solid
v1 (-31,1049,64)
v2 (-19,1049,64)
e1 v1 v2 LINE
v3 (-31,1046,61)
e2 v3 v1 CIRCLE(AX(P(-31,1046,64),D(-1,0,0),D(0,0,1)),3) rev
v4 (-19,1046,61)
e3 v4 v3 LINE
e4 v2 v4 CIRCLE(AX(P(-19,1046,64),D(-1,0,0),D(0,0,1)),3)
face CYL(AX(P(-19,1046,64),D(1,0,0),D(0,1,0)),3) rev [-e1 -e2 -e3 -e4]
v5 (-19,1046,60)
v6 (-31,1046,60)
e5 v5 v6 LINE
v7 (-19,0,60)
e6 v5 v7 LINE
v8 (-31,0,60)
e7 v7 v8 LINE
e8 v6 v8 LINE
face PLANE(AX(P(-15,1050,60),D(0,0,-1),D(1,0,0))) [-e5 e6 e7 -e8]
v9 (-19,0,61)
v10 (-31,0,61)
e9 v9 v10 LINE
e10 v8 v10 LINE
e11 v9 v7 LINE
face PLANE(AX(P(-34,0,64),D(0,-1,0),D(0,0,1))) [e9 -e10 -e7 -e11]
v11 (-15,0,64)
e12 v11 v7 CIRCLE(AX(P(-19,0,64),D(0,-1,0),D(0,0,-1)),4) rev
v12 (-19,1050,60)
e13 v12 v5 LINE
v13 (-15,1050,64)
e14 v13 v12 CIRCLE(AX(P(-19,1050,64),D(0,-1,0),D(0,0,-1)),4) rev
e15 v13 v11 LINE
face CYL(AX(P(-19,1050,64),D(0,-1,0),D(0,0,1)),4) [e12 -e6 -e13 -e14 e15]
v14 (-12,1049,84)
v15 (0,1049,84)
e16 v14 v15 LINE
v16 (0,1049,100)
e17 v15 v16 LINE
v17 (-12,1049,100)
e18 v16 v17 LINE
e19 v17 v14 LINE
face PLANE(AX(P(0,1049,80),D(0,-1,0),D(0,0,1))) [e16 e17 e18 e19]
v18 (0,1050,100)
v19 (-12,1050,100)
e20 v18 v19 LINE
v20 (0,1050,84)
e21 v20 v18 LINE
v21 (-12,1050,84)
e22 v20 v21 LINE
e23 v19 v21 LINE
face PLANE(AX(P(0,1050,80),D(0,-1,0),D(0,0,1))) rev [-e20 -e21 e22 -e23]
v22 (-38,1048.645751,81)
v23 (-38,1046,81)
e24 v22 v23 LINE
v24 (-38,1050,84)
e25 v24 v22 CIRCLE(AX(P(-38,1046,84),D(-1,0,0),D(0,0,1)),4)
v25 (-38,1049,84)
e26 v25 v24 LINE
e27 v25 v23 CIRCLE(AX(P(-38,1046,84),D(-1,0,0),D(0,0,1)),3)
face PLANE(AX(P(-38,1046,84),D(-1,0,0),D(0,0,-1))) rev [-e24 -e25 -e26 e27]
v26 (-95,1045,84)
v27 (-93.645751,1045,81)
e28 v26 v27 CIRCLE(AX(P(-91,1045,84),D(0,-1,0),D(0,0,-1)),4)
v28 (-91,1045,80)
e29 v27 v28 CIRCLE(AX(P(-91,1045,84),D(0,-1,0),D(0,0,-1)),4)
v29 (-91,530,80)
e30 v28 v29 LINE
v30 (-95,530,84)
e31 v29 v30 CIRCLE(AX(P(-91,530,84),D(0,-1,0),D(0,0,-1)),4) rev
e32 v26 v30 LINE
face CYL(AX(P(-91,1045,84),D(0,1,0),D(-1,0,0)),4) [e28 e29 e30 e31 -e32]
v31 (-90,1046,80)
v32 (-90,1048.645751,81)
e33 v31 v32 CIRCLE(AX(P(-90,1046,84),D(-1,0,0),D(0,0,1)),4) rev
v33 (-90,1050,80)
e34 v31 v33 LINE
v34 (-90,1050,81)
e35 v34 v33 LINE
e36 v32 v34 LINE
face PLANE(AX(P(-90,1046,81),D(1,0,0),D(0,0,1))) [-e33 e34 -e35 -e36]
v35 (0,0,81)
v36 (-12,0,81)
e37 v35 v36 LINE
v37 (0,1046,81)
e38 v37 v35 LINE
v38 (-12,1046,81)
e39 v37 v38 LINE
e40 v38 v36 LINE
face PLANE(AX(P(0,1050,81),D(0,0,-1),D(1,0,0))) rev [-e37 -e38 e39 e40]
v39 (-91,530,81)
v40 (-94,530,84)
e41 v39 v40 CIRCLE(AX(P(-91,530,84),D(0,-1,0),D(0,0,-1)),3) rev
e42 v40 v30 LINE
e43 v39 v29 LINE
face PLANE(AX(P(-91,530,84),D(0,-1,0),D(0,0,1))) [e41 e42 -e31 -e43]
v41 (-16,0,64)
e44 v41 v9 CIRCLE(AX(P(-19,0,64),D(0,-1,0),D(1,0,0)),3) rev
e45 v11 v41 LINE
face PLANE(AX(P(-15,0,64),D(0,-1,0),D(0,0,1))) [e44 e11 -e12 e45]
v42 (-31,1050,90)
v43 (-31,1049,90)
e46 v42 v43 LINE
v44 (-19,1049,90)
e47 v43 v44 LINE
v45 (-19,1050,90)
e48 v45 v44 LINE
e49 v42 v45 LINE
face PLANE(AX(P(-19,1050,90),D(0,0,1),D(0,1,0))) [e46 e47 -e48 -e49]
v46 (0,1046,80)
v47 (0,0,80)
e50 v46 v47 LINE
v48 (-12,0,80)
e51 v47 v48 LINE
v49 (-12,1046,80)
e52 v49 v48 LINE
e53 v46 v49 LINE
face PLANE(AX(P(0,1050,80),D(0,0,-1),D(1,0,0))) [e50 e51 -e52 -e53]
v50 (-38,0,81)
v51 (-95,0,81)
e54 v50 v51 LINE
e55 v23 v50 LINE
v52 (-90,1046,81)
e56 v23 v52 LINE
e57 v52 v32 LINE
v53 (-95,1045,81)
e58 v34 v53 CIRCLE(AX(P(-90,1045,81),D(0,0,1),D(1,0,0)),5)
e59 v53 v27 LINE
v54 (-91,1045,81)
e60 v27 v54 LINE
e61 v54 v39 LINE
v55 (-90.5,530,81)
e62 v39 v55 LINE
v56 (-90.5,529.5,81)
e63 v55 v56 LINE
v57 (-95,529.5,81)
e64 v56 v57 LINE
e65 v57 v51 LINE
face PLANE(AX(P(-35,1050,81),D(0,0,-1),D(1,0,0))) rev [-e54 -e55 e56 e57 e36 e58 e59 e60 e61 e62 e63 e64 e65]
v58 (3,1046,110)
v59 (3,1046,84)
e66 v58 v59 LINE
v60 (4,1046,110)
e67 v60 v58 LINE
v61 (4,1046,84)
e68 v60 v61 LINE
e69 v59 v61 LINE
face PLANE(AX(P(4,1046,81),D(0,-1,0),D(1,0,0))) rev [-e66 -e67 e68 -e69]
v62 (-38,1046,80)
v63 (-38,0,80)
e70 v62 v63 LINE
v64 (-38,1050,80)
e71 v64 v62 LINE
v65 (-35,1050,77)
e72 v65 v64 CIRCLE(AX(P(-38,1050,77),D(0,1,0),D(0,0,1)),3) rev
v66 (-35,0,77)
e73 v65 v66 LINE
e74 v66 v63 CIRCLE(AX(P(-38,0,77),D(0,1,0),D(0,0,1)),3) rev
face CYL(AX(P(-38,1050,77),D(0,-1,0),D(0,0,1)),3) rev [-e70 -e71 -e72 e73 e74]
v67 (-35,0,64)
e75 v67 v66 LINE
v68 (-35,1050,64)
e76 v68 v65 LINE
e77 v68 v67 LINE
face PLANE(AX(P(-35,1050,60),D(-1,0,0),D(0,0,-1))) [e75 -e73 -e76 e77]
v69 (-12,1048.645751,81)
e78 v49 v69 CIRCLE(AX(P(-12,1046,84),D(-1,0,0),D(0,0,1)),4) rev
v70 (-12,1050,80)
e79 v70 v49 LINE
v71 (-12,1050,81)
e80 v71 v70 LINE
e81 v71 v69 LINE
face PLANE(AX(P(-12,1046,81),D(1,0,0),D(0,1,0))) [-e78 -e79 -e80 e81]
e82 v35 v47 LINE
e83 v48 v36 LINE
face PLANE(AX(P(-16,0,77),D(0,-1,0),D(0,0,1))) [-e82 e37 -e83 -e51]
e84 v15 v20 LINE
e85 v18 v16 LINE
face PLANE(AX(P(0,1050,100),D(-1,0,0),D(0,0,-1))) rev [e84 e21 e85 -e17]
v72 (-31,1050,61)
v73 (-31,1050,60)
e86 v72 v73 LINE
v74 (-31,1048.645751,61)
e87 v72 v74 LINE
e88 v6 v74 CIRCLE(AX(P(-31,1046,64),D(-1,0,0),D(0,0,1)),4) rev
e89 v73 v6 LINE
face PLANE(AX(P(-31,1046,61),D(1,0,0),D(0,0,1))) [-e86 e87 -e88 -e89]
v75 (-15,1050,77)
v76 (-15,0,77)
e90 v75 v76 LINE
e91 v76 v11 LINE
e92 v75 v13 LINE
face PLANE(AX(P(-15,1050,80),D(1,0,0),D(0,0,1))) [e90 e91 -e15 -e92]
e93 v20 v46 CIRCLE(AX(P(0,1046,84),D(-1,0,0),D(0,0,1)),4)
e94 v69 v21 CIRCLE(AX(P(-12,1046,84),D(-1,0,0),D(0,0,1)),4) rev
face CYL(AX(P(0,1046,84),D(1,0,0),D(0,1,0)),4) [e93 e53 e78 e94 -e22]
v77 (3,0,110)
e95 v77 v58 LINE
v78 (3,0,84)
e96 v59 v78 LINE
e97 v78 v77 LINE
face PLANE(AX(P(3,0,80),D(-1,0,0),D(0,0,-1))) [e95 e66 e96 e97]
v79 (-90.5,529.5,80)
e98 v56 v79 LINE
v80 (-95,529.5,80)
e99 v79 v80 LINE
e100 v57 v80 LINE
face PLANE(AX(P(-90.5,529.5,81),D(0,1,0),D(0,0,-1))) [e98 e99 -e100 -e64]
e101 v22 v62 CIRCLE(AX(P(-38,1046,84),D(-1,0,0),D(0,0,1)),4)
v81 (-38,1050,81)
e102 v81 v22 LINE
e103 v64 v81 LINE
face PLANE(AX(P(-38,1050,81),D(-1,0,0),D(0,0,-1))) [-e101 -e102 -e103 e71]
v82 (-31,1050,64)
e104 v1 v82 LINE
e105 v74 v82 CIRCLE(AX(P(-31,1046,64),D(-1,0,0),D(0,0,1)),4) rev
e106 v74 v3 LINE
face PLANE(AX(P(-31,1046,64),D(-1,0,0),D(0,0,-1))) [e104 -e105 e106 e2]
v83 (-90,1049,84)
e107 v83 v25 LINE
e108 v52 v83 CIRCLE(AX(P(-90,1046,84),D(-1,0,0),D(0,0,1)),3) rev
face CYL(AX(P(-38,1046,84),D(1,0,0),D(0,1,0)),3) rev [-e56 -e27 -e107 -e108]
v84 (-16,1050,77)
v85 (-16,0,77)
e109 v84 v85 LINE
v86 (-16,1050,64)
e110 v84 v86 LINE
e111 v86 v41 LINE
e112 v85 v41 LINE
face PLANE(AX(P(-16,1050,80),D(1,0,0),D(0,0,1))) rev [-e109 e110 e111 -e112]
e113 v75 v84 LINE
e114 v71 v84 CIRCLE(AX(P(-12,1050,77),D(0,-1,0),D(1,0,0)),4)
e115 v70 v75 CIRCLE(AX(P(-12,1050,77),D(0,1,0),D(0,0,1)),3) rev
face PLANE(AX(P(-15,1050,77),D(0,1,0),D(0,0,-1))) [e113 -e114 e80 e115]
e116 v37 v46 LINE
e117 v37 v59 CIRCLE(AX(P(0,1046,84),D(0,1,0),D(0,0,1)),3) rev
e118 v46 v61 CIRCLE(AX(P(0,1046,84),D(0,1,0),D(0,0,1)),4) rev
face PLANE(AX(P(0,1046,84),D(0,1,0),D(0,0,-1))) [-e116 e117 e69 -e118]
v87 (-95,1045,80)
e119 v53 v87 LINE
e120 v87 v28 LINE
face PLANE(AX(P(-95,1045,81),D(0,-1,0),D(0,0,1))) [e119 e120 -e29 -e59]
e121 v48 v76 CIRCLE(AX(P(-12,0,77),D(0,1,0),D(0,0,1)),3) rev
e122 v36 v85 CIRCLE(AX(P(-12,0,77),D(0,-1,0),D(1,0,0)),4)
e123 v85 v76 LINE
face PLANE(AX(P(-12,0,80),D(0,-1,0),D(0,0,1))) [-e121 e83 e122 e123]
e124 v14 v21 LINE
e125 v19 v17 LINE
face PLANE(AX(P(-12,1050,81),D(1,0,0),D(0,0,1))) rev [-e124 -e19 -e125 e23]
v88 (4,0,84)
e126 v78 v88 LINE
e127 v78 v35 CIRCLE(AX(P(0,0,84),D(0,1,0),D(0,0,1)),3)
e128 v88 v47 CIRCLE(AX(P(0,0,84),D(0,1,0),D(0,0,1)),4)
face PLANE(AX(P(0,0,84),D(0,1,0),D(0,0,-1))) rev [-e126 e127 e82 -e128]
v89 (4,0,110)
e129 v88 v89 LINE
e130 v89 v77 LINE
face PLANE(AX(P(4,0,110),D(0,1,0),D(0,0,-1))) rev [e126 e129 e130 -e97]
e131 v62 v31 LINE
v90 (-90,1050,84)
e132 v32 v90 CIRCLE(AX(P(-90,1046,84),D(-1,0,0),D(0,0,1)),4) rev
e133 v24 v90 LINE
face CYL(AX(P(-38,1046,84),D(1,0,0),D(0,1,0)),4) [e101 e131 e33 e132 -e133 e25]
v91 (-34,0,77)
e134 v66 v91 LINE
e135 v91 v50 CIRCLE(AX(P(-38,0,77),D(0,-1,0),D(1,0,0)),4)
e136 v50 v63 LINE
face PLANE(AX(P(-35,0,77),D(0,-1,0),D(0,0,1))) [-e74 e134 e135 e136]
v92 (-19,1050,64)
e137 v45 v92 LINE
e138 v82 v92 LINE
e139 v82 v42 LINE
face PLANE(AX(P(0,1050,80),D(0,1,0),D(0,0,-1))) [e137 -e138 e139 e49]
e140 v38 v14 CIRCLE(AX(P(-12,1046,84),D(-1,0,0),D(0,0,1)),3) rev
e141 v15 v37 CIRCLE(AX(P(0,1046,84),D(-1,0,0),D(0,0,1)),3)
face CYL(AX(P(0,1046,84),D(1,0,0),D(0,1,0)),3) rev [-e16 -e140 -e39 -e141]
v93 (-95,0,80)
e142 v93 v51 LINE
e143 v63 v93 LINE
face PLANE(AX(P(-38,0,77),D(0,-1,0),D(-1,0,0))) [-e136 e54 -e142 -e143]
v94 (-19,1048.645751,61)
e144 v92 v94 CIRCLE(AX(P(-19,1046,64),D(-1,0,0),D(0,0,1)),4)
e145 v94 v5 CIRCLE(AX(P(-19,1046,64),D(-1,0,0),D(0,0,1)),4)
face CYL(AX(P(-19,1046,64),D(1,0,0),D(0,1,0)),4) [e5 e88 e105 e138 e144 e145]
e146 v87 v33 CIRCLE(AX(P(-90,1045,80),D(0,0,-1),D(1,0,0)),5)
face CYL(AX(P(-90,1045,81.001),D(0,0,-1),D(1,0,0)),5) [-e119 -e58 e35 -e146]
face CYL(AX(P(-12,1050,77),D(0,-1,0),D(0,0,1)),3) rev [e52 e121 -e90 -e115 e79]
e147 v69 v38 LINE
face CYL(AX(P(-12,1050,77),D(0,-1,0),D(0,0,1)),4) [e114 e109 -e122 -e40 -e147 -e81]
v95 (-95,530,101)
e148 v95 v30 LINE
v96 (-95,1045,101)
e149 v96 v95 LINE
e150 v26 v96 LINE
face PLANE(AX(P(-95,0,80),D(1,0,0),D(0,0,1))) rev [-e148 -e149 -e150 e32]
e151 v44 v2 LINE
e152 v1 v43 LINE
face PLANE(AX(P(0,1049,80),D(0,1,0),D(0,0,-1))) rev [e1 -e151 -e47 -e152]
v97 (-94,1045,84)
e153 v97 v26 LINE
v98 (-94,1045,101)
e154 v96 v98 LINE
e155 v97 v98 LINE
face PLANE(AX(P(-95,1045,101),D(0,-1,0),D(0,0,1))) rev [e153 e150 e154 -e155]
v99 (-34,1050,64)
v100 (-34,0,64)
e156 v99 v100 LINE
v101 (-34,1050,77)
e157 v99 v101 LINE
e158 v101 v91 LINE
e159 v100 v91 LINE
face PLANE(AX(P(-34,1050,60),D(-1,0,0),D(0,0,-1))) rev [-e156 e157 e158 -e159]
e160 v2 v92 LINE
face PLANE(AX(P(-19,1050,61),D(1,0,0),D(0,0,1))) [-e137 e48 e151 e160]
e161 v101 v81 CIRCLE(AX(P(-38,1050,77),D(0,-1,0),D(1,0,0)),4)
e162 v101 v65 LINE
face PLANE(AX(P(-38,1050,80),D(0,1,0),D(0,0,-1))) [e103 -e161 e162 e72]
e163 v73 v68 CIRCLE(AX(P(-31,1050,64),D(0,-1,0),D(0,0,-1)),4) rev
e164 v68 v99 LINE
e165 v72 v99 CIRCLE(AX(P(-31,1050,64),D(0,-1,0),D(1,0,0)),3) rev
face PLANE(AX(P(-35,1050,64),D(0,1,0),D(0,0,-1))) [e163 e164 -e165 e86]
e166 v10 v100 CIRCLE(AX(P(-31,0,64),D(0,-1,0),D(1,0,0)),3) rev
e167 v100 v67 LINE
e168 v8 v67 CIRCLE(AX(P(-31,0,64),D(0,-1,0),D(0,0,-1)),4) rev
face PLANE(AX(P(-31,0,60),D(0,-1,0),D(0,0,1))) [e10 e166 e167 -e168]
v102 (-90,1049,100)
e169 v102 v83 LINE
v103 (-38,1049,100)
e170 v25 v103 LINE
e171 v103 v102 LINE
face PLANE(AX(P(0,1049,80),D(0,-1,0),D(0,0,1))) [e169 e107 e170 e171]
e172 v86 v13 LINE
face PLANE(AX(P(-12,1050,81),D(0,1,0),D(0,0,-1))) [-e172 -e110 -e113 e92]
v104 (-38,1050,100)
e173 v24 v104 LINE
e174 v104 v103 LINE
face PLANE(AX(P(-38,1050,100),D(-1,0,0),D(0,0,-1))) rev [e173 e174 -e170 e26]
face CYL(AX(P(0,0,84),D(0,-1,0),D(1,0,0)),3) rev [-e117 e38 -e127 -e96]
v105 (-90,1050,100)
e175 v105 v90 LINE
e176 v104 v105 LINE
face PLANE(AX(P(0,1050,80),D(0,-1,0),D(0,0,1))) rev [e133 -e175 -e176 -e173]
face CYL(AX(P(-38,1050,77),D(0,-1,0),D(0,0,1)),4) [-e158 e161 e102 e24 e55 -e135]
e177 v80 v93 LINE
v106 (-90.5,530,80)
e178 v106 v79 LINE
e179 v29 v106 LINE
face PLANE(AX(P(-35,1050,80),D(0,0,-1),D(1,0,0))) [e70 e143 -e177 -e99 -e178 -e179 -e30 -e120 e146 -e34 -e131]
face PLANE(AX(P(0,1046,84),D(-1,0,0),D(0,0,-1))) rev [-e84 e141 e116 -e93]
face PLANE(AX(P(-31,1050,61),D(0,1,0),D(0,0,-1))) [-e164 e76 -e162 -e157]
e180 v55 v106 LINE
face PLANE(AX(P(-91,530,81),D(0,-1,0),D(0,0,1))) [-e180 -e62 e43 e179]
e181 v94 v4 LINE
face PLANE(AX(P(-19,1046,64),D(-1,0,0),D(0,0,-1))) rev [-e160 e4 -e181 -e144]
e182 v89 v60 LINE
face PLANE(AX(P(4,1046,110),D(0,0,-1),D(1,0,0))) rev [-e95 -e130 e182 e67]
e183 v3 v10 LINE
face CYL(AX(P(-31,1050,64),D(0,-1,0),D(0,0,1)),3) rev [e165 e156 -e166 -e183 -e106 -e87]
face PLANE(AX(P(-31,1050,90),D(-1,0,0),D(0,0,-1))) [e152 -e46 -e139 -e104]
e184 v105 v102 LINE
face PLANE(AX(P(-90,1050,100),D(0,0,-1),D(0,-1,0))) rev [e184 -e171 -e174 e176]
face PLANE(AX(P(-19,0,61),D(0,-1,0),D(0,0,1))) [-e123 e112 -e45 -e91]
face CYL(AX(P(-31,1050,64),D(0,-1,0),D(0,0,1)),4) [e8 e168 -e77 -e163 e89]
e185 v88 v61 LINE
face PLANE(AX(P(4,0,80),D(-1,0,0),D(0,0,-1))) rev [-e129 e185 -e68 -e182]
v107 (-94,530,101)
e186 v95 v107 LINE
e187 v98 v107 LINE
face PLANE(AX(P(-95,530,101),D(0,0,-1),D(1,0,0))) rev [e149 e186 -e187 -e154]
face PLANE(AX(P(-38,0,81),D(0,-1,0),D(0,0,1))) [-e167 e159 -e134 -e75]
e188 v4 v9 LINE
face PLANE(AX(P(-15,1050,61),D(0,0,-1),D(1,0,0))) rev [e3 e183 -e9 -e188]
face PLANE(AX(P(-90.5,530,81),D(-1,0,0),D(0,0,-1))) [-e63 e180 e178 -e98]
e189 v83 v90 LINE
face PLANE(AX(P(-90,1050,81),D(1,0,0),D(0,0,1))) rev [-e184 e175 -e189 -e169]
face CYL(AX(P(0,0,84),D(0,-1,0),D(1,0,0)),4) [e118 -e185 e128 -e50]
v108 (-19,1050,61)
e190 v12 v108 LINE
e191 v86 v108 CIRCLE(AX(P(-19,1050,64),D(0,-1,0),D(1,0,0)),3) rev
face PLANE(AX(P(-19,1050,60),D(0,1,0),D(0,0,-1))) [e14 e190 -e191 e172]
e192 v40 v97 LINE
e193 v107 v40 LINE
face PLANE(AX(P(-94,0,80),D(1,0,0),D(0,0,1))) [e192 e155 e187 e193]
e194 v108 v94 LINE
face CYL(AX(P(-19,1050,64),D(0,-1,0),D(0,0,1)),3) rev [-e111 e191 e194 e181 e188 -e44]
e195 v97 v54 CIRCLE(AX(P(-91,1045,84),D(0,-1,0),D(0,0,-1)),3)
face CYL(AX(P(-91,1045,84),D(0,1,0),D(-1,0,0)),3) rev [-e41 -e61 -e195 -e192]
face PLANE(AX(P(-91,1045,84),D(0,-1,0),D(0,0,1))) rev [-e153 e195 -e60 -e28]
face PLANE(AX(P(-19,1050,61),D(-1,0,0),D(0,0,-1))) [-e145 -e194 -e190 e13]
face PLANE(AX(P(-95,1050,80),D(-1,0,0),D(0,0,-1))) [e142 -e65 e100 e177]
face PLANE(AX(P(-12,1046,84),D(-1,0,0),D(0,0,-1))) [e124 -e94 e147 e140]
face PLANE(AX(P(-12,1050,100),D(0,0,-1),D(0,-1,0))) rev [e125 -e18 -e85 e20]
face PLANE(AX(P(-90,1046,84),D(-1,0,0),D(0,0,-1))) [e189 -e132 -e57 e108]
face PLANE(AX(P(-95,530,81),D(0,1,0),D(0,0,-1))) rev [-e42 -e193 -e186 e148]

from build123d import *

# Parameters (mm, degrees)
BASE_FLANGE1_DEPTH             = 1050
CUT_EXTRUDE1_REACH             = 1056.479
EDGE_FLANGE5_STRIP_W           = 20
EDGE_FLANGE5_STRIP_H           = 1
EDGE_FLANGE5_STRIP_CUT_DEPTH   = 52
EDGE_FLANGE5_STRIP_2_W         = 20
EDGE_FLANGE5_STRIP_2_H         = 1
EDGE_FLANGE5_STRIP_CUT_2_DEPTH = 12
EDGE_FLANGE5_DEPTH             = 52
EDGE_FLANGE5_BEND_DEPTH        = 12
EDGE_FLANGE7_DEPTH             = 1046
EDGE_FLANGE8_STRIP_W           = 10
EDGE_FLANGE8_STRIP_H           = 1
EDGE_FLANGE8_STRIP_CUT_DEPTH   = 12
EDGE_FLANGE8_DEPTH             = 12
EDGE_FLANGE9_START             = 529.5
EDGE_FLANGE9_DEPTH             = 515.5
EDGE_FLANGE9_2_DEPTH           = 0.5
EDGE_FLANGE9_START_2           = 530
EDGE_FLANGE9_3_DEPTH           = 515


# Read off the part's stored shape, not the designer's step: Edge-Flange9
# Sheet-metal steps are written as plain solids
with BuildPart() as part:
    # Sketch1 → Base-Flange1 (new body)
    with BuildSketch(Plane(origin=(0, 0, 0), x_dir=(1, 0, 0), z_dir=(0, 1, 0))):
        with BuildLine():
            Line((0, 0), (-12, 0))
            ThreePointArc((-12, 0), (-14.121320344, -0.878679656), (-15, -3))
            Line((-15, -3), (-15, -16))
            ThreePointArc((-15, -16), (-16.171572875, -18.828427125), (-19, -20))
            Line((-19, -20), (-31, -20))
            ThreePointArc((-31, -20), (-33.828427125, -18.828427125), (-35, -16))
            Line((-35, -16), (-35, -3))
            ThreePointArc((-35, -3), (-35.878679656, -0.878679656), (-38, 0))
            Line((-38, 0), (-95, 0))
            Line((-95, 0), (-95, 1))
            Line((-95, 1), (-38, 1))
            ThreePointArc((-38, 1), (-35.171572875, -0.171572875), (-34, -3))
            Line((-34, -3), (-34, -16))
            ThreePointArc((-34, -16), (-33.121320344, -18.121320344), (-31, -19))
            Line((-31, -19), (-19, -19))
            ThreePointArc((-19, -19), (-16.878679656, -18.121320344), (-16, -16))
            Line((-16, -16), (-16, -3))
            ThreePointArc((-16, -3), (-14.828427125, -0.171572875), (-12, 1))
            Line((-12, 1), (0, 1))
            Line((0, 1), (0, 0))
        make_face()
    extrude(amount=BASE_FLANGE1_DEPTH)

    # Sketch18 → Cut-Extrude1 (cut, up to next)
    with BuildSketch(Plane.XY, mode=Mode.PRIVATE) as cut_extrude1_sk1:
        with BuildLine():
            Line((-95, 1045), (-95, 1050))
            Line((-95, 1050), (-90, 1050))
            ThreePointArc((-90, 1050), (-93.535533906, 1048.535533906), (-95, 1045))
        make_face()
    cut_extrude1_tool1 = extrude(cut_extrude1_sk1.sketch, amount=-CUT_EXTRUDE1_REACH, mode=Mode.PRIVATE) & part.part
    add(cut_extrude1_tool1.solids().sort_by_distance((-93.88316, 1048.88316, 0))[0], mode=Mode.SUBTRACT)

    # Edge-Flange5 strip (across the edge) → Edge-Flange5 strip cut (cut)
    with BuildSketch(Plane(origin=(-90, 1050, -1), x_dir=(0, -1, 0), z_dir=(1, 0, 0))):
        with Locations((-6, -0.5)):
            Rectangle(EDGE_FLANGE5_STRIP_W, EDGE_FLANGE5_STRIP_H)
    extrude(amount=EDGE_FLANGE5_STRIP_CUT_DEPTH, mode=Mode.SUBTRACT)

    # Edge-Flange5 strip 2 (across the edge) → Edge-Flange5 strip cut 2 (cut)
    with BuildSketch(Plane(origin=(-12, 1050, -1), x_dir=(0, -1, 0), z_dir=(1, 0, 0))):
        with Locations((-6, -0.5)):
            Rectangle(EDGE_FLANGE5_STRIP_2_W, EDGE_FLANGE5_STRIP_2_H)
    extrude(amount=EDGE_FLANGE5_STRIP_CUT_2_DEPTH, mode=Mode.SUBTRACT)

    # Edge-Flange5 section (across the edge) → Edge-Flange5 (add)
    with BuildSketch(Plane(origin=(-90, 1050, -1), x_dir=(0, -1, 0), z_dir=(1, 0, 0))):
        with BuildLine():
            Line((0, 3), (0, 19))
            Line((0, 19), (1, 19))
            Line((1, 19), (1, 3))
            ThreePointArc((1, 3), (1.878679656, 0.878679656), (4, 0))
            Line((4, 0), (4, -1))
            ThreePointArc((4, -1), (1.171572875, 0.171572875), (0, 3))
        make_face()
    extrude(amount=EDGE_FLANGE5_DEPTH)

    # Edge-Flange5 section 2 (across the edge) → Edge-Flange5 bend (add)
    with BuildSketch(Plane(origin=(-12, 1050, -1), x_dir=(0, -1, 0), z_dir=(1, 0, 0))):
        with BuildLine():
            Line((0, 3), (0, 19))
            Line((0, 19), (1, 19))
            Line((1, 19), (1, 3))
            ThreePointArc((1, 3), (1.878679656, 0.878679656), (4, 0))
            Line((4, 0), (4, -1))
            ThreePointArc((4, -1), (1.171572875, 0.171572875), (0, 3))
        make_face()
    extrude(amount=EDGE_FLANGE5_BEND_DEPTH)

    # Edge-Flange7 section (across the edge) → Edge-Flange7 (add)
    with BuildSketch(Plane(origin=(3, 1046, -1), x_dir=(-1, 0, 0), z_dir=(0, -1, 0))):
        with BuildLine():
            Line((-1, 3), (-1, 29))
            Line((-1, 29), (0, 29))
            Line((0, 29), (0, 3))
            ThreePointArc((0, 3), (0.878679656, 0.878679656), (3, 0))
            Line((3, 0), (3, -1))
            ThreePointArc((3, -1), (0.171572875, 0.171572875), (-1, 3))
        make_face()
    extrude(amount=EDGE_FLANGE7_DEPTH)

    # Edge-Flange8 strip (across the edge) → Edge-Flange8 strip cut (cut)
    with BuildSketch(Plane(origin=(-31, 1050, 19), x_dir=(0, -1, 0), z_dir=(1, 0, 0))):
        with Locations((-1, -0.5)):
            Rectangle(EDGE_FLANGE8_STRIP_W, EDGE_FLANGE8_STRIP_H)
    extrude(amount=EDGE_FLANGE8_STRIP_CUT_DEPTH, mode=Mode.SUBTRACT)

    # Edge-Flange8 section (across the edge) → Edge-Flange8 (add)
    with BuildSketch(Plane(origin=(-31, 1050, 19), x_dir=(0, -1, 0), z_dir=(1, 0, 0))):
        with BuildLine():
            Line((0, 3), (0, 29))
            Line((0, 29), (1, 29))
            Line((1, 29), (1, 3))
            ThreePointArc((1, 3), (1.878679656, 0.878679656), (4, 0))
            Line((4, 0), (4, -1))
            ThreePointArc((4, -1), (1.171572875, 0.171572875), (0, 3))
        make_face()
    extrude(amount=EDGE_FLANGE8_DEPTH)

    # Edge-Flange9 outline → Edge-Flange9 (cut)
    with BuildSketch(Plane(origin=(0, 0, 0), x_dir=(1, 0, 0), z_dir=(0, 1, 0)).offset(EDGE_FLANGE9_START)):
        with BuildLine():
            ThreePointArc((-91, 0), (-92.414213563, 0.258342613), (-93.645751312, 1))
            Line((-93.645751312, 1), (-95, 1))
            Line((-95, 1), (-95, 0))
            Line((-95, 0), (-91, 0))
        make_face()
    extrude(amount=EDGE_FLANGE9_DEPTH, mode=Mode.SUBTRACT)

    # Edge-Flange9 2 outline → Edge-Flange9 2 (cut)
    with BuildSketch(Plane(origin=(0, 0, 0), x_dir=(1, 0, 0), z_dir=(0, 1, 0)).offset(EDGE_FLANGE9_START)):
        with BuildLine():
            Line((-90.5, 1), (-93.645751312, 1))
            ThreePointArc((-93.645751312, 1), (-92.414213563, 0.258342613), (-91, 0))
            Line((-91, 0), (-90.5, 0))
            Line((-90.5, 0), (-90.5, 1))
        make_face()
    extrude(amount=EDGE_FLANGE9_2_DEPTH, mode=Mode.SUBTRACT)

    # Edge-Flange9 3 outline → Edge-Flange9 3 (add)
    with BuildSketch(Plane(origin=(0, 0, 0), x_dir=(1, 0, 0), z_dir=(0, 1, 0)).offset(EDGE_FLANGE9_START_2)):
        with BuildLine():
            Line((-95, 21), (-95, 4))
            ThreePointArc((-95, 4), (-94.645751311, 2.354248689), (-93.645751312, 1))
            Line((-93.645751312, 1), (-91, 1))
            ThreePointArc((-91, 1), (-93.121320344, 1.878679656), (-94, 4))
            Line((-94, 4), (-94, 21))
            Line((-94, 21), (-95, 21))
        make_face()
    extrude(amount=EDGE_FLANGE9_3_DEPTH)


with BuildPart() as body_2:
    # Mirror5: mirrored copy
    add(part.part.mirror(Plane.XY.offset(40)))


solid = body_2.part
